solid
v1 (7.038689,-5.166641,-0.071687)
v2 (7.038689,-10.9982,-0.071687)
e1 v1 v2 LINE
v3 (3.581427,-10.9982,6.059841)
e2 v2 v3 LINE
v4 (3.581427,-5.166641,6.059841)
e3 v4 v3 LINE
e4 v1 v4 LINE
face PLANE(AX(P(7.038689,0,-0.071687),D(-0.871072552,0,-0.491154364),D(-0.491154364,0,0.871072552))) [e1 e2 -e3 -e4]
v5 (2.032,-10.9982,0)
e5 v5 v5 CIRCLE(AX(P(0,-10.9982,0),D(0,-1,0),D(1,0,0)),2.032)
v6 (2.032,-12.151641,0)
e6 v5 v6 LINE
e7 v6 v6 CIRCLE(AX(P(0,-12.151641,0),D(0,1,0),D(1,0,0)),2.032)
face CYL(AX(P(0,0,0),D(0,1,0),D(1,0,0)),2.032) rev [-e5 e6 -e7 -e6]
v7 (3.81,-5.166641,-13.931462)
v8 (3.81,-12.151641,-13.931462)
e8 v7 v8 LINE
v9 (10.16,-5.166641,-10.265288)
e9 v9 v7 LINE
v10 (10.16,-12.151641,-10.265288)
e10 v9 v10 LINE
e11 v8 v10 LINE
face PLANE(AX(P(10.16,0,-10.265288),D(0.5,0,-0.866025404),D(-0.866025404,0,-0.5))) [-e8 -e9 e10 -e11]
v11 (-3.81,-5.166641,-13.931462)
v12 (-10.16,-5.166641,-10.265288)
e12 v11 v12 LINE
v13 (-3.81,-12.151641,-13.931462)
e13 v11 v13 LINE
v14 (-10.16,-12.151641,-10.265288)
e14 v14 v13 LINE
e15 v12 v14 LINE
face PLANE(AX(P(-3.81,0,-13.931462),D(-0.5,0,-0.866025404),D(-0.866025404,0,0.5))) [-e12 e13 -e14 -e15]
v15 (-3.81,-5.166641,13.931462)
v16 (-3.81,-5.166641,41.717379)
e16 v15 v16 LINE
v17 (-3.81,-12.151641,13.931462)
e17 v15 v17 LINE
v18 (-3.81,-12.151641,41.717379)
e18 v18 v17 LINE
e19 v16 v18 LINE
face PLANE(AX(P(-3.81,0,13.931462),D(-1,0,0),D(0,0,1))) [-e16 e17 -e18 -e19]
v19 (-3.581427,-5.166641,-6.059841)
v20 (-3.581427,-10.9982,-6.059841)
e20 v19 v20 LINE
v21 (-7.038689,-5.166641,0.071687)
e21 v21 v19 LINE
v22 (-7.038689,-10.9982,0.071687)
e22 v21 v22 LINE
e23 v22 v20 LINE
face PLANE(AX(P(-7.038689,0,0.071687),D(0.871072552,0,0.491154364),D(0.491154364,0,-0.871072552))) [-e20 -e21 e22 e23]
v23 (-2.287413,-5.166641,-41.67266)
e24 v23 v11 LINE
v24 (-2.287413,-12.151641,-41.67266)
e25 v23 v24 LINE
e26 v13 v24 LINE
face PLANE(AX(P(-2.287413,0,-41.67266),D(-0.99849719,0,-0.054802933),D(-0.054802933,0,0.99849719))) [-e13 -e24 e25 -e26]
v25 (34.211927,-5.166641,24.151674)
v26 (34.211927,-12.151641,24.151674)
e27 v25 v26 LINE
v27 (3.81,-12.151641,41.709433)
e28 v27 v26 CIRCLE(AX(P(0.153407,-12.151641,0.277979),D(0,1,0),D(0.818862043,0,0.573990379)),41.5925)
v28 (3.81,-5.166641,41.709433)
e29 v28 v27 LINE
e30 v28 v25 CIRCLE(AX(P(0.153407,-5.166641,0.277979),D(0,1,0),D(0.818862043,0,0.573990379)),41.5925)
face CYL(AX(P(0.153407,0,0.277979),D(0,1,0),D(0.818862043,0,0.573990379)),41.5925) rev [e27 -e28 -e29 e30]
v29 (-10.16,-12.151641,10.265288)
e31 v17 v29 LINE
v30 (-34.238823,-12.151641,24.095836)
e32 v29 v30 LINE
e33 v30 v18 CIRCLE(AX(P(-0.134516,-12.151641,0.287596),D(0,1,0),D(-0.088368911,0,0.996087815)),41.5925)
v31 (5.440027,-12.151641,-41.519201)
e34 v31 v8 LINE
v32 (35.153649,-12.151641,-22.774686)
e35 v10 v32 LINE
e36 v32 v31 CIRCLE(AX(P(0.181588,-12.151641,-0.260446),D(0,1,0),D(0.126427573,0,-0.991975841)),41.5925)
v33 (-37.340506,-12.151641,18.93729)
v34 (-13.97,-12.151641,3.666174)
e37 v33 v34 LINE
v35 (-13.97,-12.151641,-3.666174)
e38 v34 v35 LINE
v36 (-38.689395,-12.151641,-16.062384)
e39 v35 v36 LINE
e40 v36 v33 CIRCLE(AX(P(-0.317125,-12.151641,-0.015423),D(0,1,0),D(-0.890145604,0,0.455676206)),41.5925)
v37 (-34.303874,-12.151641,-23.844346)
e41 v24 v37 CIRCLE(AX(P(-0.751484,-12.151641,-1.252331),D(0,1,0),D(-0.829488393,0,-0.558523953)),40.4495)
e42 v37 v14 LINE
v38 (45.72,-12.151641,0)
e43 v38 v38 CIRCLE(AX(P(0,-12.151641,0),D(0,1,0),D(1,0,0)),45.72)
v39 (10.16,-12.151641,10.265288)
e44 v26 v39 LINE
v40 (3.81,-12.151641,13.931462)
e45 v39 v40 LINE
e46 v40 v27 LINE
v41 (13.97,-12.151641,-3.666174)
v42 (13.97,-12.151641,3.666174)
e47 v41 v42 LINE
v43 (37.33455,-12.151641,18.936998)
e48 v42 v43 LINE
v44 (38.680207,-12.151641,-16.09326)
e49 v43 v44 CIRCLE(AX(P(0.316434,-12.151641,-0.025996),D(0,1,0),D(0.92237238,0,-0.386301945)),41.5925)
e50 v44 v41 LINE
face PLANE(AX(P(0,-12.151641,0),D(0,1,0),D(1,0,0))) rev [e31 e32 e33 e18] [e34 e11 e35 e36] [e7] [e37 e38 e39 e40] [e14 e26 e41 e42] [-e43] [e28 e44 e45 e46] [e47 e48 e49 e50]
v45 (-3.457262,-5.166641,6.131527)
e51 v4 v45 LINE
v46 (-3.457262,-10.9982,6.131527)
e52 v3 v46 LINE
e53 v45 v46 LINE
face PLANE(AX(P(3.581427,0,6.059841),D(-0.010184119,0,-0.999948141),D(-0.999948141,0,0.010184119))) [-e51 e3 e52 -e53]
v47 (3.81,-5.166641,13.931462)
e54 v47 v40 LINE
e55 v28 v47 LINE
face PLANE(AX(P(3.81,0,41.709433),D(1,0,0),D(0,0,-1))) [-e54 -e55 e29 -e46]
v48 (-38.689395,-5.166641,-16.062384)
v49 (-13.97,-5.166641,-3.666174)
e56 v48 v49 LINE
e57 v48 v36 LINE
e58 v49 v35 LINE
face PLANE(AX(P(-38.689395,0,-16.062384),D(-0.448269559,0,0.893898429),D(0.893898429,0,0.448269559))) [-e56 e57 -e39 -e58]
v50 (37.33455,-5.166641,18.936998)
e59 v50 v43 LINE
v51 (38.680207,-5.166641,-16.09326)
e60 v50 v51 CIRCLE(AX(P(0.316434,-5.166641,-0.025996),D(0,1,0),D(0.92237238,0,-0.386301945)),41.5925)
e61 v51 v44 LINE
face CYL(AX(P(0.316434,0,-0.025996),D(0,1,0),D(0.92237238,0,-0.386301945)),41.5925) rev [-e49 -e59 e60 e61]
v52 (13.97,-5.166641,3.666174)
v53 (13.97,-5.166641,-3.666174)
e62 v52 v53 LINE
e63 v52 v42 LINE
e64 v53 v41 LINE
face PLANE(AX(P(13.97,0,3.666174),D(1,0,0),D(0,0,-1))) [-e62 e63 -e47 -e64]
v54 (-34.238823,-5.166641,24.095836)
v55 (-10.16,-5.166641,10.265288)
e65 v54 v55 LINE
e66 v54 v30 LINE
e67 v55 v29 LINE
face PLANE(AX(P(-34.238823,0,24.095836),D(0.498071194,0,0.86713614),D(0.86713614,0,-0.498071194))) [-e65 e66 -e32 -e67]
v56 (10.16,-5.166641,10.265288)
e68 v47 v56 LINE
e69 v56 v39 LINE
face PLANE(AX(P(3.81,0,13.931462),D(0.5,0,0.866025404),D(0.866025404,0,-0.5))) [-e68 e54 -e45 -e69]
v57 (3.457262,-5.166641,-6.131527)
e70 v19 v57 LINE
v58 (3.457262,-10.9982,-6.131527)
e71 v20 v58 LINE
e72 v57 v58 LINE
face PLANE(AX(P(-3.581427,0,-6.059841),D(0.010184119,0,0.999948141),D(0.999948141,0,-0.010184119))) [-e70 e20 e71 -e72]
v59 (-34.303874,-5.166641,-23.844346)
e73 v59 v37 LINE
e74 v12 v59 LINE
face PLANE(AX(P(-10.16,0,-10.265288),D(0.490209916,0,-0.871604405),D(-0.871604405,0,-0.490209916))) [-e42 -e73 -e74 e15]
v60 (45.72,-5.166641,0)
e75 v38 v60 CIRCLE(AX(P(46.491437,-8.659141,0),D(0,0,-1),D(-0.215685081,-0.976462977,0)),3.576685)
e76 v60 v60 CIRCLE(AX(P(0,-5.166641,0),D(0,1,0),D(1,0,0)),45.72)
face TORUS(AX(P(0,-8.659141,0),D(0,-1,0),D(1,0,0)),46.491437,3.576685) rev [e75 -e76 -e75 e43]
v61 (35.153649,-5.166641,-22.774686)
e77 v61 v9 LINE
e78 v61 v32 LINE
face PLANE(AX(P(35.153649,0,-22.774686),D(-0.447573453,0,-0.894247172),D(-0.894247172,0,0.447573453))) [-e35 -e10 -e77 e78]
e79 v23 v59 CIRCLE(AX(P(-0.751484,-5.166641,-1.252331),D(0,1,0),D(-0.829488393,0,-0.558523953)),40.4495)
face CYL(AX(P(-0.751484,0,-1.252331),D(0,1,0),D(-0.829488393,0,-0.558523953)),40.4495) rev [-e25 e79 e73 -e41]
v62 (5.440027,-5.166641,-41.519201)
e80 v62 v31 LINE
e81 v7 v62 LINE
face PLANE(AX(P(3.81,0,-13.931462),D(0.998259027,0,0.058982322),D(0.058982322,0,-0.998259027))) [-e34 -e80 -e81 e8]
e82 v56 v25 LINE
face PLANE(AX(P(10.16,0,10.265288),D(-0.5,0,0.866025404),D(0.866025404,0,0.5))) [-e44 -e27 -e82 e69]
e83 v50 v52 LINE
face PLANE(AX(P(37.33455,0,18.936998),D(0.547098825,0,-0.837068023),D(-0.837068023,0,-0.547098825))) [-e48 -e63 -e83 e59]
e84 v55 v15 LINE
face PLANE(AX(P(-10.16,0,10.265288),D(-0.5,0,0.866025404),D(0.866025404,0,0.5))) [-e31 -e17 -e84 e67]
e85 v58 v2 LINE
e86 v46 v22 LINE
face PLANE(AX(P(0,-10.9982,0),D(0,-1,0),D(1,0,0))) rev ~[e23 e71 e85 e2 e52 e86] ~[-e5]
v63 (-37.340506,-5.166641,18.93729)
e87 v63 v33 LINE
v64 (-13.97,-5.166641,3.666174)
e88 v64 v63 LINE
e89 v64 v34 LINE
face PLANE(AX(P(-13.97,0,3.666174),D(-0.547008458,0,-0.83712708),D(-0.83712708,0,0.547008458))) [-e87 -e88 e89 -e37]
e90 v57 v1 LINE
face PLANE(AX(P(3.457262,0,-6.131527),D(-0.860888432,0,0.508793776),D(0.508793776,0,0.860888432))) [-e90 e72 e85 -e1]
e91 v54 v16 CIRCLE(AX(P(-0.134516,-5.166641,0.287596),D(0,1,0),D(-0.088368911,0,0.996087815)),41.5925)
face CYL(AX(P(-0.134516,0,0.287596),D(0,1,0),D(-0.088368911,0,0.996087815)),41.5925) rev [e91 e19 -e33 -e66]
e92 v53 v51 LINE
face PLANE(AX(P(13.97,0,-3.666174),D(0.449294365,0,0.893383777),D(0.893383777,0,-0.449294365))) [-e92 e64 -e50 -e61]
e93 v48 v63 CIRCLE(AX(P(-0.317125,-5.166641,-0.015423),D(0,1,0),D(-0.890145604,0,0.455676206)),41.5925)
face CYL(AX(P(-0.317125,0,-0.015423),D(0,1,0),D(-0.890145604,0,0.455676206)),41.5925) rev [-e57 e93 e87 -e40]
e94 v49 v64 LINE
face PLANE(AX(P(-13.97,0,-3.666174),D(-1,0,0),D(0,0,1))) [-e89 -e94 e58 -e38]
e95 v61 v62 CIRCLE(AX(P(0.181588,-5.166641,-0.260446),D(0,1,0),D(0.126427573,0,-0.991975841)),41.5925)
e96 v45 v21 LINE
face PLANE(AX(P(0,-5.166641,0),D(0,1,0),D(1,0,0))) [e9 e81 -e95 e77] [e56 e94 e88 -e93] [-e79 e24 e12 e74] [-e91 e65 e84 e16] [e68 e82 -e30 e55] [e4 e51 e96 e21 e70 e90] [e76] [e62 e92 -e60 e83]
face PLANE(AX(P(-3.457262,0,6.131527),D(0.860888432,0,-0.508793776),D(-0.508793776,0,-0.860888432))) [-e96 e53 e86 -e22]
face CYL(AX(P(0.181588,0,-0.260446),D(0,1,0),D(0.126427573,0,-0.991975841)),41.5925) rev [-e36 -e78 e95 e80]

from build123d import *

# Parameters (mm, degrees)
F2_R     = 2.032
F3_DEPTH = 15.875
F4_DEPTH = 10.9982


# Not quite as in the source:
# - a feature names something its author has since deleted; it is built from what else it names


with BuildPart() as f1:
    # F0 (on Top) → F1 (revolve)
    with BuildSketch(Plane.XY):
        with BuildLine():
            Line((0, -5.1666409709), (0, -12.1516409709))
            Line((0, -12.1516409709), (45.72, -12.1516409709))
            ThreePointArc((45.72, -12.1516409709), (42.9147529825, -8.6591409709), (45.72, -5.1666409709))
            Line((45.72, -5.1666409709), (0, -5.1666409709))
        make_face()
    revolve(axis=Axis((0, -8.561744864, 0), (0, 1, 0)))

    # F2 (on Front) → F3 (cut)
    with BuildSketch(Plane.XZ):
        with BuildLine():
            Line((13.97, 3.6661742094), (13.97, -3.6661742094))
            Line((13.97, -3.6661742094), (38.6802071591, -16.0932599922))
            ThreePointArc((38.6802071591, -16.0932599922), (41.8782799617, 1.5705660984), (37.3345500424, 18.9369975174))
            Line((37.3345500424, 18.9369975174), (13.97, 3.6661742094))
        make_face()
        with BuildLine():
            Line((3.81, 41.7094333604), (3.81, 13.9314619955))
            Line((3.81, 13.9314619955), (10.16, 10.2652877862))
            Line((10.16, 10.2652877862), (34.2119266748, 24.1516741264))
            ThreePointArc((34.2119266748, 24.1516741264), (20.9542761873, 36.2954737188), (3.81, 41.7094333604))
        make_face()
        with BuildLine():
            Line((-34.2388233597, 24.0958361272), (-10.16, 10.2652877862))
            Line((-10.16, 10.2652877862), (-3.81, 13.9314619955))
            Line((-3.81, 13.9314619955), (-3.81, 41.7173788368))
            ThreePointArc((-3.81, 41.7173788368), (-20.9781685322, 36.2803485402), (-34.2388233597, 24.0958361272))
        make_face()
        with BuildLine():
            Line((-38.6893950171, -16.0623838358), (-13.97, -3.6661742094))
            Line((-13.97, -3.6661742094), (-13.97, 3.6661742094))
            Line((-13.97, 3.6661742094), (-37.3405062231, 18.9372899969))
            ThreePointArc((-37.3405062231, 18.9372899969), (-41.8787701809, 1.5863648371), (-38.6893950171, -16.0623838358))
        make_face()
        with BuildLine():
            Line((-3.81, -13.9314619955), (-10.16, -10.2652877862))
            Line((-10.16, -10.2652877862), (-34.3038742814, -23.844345572))
            ThreePointArc((-34.3038742814, -23.844345572), (-20.4303998238, -36.5921428083), (-2.2874128339, -41.6726596109))
            Line((-2.2874128339, -41.6726596109), (-3.81, -13.9314619955))
        make_face()
        with BuildLine():
            Line((10.16, -10.2652877862), (3.81, -13.9314619955))
            Line((3.81, -13.9314619955), (5.4400267393, -41.5192010913))
            ThreePointArc((5.4400267393, -41.5192010913), (22.3730839146, -35.4381883413), (35.1536490306, -22.7746857971))
            Line((35.1536490306, -22.7746857971), (10.16, -10.2652877862))
        make_face()
        Circle(F2_R)
    extrude(amount=F3_DEPTH, mode=Mode.SUBTRACT)

    # F2 (on Front) → F4 (cut)
    with BuildSketch(Plane.XZ):
        Polygon((-7.0386894402, 0.071686571), (-3.5814271117, -6.059840579), (3.4572623285, -6.1315271501), (7.0386894402, -0.071686571), (3.5814271117, 6.059840579), (-3.4572623285, 6.1315271501), align=None)
        Circle(F2_R, mode=Mode.SUBTRACT)
    extrude(amount=F4_DEPTH, mode=Mode.SUBTRACT)


solid = f1.part
